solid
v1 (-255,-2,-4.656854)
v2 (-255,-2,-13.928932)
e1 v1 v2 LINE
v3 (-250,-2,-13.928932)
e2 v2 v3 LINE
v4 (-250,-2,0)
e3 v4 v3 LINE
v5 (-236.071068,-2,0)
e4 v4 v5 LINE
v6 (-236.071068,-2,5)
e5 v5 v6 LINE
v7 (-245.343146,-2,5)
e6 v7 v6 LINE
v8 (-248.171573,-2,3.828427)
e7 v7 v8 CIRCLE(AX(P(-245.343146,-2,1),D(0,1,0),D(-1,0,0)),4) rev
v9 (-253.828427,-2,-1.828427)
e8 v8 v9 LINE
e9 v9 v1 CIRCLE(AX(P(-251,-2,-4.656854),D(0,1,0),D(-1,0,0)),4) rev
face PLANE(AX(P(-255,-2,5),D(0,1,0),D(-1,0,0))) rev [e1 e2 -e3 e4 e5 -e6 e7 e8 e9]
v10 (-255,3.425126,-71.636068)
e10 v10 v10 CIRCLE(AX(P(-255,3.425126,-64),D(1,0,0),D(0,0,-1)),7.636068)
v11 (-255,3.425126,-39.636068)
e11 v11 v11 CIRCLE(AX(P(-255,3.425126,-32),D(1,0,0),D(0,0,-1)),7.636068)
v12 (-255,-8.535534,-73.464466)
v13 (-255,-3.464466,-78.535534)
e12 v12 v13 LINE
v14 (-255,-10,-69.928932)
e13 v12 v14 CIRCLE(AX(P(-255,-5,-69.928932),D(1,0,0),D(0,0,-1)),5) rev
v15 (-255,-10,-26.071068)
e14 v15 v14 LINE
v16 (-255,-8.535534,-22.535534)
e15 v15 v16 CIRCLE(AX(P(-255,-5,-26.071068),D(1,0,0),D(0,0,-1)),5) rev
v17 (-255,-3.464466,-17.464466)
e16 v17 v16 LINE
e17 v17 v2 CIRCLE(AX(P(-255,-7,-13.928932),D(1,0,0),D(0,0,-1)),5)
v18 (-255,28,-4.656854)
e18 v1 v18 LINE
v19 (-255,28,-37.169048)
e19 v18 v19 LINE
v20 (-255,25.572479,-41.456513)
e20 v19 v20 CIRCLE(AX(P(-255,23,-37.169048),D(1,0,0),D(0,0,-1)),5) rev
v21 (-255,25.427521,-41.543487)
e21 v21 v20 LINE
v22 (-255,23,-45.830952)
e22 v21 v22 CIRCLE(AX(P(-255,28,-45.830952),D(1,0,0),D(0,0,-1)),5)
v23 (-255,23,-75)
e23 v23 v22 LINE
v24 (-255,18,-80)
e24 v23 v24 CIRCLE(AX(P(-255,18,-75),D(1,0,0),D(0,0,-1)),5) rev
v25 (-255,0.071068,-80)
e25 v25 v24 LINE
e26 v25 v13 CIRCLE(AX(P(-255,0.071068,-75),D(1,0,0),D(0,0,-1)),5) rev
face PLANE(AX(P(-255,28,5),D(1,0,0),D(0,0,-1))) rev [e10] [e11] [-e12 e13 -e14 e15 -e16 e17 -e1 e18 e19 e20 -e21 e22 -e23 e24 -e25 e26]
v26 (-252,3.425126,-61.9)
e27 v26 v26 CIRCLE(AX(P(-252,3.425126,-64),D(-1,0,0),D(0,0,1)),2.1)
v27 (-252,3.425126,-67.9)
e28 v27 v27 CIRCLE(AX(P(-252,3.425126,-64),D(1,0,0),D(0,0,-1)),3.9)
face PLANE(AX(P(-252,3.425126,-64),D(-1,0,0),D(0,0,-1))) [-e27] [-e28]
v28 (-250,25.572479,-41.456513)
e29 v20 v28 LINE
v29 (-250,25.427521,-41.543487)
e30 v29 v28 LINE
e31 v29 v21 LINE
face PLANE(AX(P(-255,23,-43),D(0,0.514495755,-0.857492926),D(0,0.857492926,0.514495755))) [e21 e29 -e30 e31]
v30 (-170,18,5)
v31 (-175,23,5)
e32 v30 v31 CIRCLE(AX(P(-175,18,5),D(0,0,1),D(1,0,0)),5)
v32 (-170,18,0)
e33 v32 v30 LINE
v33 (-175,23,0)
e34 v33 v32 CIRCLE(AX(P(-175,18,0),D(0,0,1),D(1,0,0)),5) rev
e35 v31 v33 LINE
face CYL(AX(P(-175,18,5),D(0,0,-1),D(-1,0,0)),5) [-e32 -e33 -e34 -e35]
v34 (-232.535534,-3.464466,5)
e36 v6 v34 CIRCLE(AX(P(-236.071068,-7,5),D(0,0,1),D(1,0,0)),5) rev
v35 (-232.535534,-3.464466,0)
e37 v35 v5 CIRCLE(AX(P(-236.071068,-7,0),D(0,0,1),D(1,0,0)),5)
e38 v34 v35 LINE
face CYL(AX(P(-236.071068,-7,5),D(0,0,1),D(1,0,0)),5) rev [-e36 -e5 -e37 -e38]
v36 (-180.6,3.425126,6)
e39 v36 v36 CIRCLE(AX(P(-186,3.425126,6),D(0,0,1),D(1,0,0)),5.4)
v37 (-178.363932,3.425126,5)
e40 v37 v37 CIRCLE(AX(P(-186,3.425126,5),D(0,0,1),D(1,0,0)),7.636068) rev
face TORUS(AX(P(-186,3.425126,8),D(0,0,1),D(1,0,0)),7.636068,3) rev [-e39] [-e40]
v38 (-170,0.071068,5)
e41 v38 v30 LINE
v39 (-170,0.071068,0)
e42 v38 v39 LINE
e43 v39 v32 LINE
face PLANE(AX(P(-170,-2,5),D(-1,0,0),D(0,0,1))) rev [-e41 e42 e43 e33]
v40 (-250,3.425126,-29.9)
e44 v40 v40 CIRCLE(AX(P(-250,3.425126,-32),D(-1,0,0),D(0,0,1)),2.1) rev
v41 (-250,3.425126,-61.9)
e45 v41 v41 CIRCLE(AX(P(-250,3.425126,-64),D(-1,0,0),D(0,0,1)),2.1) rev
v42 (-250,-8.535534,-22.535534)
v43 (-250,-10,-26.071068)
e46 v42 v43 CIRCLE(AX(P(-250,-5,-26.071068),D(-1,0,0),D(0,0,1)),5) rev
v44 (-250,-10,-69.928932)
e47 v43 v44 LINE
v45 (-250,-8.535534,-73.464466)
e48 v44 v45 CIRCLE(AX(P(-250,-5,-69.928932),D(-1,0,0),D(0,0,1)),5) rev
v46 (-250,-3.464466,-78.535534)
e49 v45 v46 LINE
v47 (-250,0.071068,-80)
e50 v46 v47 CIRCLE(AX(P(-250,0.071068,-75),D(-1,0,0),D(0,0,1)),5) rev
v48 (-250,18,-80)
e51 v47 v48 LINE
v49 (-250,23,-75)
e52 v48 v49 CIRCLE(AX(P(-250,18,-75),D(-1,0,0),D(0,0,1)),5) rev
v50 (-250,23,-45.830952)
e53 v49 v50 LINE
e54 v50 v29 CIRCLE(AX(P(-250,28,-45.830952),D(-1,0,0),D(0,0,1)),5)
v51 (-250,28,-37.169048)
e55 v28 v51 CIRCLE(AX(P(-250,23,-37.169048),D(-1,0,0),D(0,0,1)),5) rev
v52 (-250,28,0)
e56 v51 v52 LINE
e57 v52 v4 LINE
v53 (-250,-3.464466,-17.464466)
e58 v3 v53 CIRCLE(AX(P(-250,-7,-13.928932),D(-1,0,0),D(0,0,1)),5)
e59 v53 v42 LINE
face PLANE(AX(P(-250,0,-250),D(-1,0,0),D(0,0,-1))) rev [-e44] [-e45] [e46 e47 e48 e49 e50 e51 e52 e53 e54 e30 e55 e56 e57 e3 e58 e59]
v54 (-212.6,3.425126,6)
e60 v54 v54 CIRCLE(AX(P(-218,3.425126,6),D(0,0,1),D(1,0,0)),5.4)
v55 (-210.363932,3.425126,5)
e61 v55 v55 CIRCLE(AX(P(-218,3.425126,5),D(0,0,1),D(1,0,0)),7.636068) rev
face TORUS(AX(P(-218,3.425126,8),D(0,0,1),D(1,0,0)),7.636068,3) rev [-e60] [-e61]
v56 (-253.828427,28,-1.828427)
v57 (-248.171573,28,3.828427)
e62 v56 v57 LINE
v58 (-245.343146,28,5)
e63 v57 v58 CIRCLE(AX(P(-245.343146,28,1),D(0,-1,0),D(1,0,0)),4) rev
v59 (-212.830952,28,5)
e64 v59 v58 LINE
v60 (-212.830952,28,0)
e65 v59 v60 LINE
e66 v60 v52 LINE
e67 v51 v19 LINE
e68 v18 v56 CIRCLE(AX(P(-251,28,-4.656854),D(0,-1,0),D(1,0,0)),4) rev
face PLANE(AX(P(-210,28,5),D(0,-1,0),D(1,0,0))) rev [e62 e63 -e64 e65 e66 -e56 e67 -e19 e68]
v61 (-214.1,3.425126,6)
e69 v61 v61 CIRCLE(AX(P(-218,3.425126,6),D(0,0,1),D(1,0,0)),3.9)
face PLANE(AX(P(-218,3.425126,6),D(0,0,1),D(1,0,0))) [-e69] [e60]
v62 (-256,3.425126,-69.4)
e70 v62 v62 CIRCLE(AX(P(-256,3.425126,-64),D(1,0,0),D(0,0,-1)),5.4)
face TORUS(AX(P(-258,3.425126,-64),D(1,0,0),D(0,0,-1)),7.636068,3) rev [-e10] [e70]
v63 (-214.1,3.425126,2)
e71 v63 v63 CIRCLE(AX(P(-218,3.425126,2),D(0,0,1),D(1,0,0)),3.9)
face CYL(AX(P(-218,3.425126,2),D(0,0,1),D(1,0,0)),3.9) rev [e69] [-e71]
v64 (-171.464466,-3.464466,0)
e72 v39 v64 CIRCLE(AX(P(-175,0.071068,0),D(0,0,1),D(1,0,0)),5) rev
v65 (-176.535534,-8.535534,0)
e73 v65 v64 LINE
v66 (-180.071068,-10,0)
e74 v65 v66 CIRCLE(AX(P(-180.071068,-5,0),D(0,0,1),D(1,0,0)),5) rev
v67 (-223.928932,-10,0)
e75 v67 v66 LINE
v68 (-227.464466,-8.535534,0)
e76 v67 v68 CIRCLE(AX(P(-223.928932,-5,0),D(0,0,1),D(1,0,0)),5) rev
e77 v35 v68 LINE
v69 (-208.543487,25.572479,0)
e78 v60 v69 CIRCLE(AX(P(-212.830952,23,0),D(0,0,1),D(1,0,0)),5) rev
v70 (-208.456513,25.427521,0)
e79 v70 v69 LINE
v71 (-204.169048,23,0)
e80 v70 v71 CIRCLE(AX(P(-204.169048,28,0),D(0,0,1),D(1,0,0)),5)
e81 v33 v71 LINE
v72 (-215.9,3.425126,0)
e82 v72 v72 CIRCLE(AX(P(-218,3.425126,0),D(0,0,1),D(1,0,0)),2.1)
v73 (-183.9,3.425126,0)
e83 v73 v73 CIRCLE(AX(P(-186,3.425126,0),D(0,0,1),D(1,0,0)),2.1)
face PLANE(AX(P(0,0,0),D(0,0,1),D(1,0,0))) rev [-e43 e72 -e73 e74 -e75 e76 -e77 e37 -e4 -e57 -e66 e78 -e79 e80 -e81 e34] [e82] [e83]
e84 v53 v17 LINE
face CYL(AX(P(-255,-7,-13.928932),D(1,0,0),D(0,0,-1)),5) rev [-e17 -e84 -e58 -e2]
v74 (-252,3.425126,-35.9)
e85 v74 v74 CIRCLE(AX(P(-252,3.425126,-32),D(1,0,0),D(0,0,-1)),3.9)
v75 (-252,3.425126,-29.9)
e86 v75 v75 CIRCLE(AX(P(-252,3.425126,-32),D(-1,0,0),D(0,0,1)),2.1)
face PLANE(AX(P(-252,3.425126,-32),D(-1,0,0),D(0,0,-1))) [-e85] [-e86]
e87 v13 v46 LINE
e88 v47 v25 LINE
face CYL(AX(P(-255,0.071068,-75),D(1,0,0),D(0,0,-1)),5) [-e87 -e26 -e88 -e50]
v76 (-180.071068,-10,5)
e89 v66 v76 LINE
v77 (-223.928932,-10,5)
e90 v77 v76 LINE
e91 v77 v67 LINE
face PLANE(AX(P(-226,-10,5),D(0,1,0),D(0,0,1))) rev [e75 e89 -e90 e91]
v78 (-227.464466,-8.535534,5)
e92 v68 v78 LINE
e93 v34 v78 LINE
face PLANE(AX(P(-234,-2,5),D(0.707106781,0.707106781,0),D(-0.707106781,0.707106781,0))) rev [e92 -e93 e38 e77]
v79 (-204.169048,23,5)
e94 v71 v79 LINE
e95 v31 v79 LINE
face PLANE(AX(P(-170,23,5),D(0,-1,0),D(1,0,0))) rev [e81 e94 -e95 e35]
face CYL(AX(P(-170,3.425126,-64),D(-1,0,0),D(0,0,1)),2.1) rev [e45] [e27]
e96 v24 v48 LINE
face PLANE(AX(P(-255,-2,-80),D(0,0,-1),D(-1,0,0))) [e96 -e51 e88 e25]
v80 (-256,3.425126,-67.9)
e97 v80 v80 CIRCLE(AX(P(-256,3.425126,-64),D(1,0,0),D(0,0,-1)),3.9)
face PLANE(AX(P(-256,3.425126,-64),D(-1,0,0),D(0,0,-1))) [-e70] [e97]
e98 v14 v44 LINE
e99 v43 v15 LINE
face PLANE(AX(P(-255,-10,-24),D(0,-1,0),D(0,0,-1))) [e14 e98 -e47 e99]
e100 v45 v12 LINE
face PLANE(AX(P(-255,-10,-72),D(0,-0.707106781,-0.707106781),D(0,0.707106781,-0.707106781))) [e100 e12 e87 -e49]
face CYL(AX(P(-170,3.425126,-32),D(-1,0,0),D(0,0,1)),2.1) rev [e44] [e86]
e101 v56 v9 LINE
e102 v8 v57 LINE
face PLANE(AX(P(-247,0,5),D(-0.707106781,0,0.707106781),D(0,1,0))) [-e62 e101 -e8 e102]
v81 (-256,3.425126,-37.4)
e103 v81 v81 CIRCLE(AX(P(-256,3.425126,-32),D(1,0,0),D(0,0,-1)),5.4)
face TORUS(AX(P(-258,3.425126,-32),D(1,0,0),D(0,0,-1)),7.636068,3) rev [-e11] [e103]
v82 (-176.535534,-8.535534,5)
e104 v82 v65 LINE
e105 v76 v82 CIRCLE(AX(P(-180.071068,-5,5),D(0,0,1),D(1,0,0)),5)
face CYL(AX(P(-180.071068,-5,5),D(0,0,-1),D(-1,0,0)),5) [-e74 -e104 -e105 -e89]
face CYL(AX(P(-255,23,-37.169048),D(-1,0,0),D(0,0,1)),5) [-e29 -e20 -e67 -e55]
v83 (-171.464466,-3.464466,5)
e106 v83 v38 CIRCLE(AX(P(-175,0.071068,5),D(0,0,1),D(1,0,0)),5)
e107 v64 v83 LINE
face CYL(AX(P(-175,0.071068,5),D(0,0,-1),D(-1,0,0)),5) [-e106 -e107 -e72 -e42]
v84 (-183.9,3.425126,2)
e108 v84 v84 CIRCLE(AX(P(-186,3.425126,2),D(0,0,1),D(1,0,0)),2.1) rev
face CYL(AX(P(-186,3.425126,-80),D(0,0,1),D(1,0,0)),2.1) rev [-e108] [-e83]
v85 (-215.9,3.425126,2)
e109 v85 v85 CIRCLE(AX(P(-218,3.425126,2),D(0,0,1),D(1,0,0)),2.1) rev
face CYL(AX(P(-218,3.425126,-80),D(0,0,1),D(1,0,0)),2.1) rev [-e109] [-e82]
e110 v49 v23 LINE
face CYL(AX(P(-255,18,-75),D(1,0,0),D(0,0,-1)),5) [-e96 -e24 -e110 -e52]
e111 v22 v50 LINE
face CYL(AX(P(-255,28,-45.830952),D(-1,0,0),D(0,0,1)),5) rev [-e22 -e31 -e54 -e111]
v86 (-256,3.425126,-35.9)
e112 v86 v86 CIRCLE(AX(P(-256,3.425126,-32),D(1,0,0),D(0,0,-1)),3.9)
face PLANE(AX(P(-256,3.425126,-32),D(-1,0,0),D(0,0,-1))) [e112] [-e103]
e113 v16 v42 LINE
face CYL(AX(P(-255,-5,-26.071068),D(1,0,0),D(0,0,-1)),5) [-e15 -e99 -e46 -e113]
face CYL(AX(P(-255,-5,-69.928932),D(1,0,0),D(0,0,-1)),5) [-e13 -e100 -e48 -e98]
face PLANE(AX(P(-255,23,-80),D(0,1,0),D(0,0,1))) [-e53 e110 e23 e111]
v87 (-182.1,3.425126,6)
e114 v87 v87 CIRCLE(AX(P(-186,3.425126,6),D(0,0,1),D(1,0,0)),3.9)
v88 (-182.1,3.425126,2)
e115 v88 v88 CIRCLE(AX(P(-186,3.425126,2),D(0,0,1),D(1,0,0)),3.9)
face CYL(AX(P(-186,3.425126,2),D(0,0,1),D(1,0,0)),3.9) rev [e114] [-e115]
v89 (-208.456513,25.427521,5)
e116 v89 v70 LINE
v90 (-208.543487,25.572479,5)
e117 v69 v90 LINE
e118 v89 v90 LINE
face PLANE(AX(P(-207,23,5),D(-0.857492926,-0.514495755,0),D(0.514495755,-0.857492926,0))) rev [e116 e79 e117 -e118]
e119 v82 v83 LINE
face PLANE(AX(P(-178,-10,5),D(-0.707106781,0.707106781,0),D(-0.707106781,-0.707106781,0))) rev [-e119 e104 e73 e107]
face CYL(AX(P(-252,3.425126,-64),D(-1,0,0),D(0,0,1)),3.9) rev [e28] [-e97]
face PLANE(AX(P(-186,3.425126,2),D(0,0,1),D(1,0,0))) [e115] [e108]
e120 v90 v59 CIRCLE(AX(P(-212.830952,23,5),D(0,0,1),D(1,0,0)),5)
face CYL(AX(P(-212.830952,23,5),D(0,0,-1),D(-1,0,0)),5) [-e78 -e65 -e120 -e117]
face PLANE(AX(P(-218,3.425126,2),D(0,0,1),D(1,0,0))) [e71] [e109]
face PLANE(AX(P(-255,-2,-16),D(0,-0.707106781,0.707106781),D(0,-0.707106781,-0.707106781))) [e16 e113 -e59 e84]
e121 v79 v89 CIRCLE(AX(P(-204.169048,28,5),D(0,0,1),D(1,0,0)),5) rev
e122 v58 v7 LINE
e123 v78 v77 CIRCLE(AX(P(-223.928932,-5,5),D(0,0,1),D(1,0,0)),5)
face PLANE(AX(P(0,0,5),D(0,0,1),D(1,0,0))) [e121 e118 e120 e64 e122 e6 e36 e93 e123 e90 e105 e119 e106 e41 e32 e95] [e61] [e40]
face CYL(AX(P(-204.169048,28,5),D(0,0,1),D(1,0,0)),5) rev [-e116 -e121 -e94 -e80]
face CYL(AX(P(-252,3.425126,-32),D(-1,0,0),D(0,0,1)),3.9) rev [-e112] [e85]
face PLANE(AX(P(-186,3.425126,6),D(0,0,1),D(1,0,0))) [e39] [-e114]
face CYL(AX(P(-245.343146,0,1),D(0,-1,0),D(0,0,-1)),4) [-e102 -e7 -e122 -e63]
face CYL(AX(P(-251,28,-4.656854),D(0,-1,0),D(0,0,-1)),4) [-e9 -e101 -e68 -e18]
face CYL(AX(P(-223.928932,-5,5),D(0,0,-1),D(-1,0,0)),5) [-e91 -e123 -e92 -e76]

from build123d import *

# Parameters (mm, degrees)
BOSS_EXTRUDE1_DEPTH = 5
FILLET1_R           = 5
CHAMFER1_SIZE       = 8
FILLET2_R           = 4
SKETCH2_R           = 2.1
CUT_EXTRUDE1_DEPTH  = 271.24803422
SKETCH3_R           = 3.9
CUT_EXTRUDE2_DEPTH  = 3
BOSS_EXTRUDE2_START = 1
SKETCH4_R           = 5.4
SKETCH4_R_2         = 3.9
BOSS_EXTRUDE2_DEPTH = 1
FILLET3_R           = 3


with BuildPart() as part:
    # Sketch1 → Boss-Extrude1 (new body)
    with BuildSketch(Plane.XY):
        Polygon((-255, 28), (-255, -2), (-234, -2), (-226, -10), (-178, -10), (-170, -2), (-170, 23), (-207, 23), (-210, 28), align=None)
    boss_extrude1 = extrude(amount=BOSS_EXTRUDE1_DEPTH)

    # Mirror1: Boss-Extrude1 across plane
    add(boss_extrude1.mirror(Plane(origin=(-125, 0, -125), x_dir=(-0.7071067811865489, 0, 0.7071067811865462), z_dir=(-0.7071067811865464, 0, -0.7071067811865488))))

    # Fillet1
    fillet1_edges = [part.edges().sort_by_distance(p)[0] for p in [
        (-210, 28, 2.5),
        (-207, 23, 2.5),
        (-170, 23, 2.5),
        (-170, -2, 2.5),
        (-178, -10, 2.5),
        (-226, -10, 2.5),
        (-234, -2, 2.5),
        (-252.5, -2, -16),
        (-252.5, 28, -40),
        (-252.5, 23, -43),
        (-252.5, 23, -80),
        (-252.5, -2, -80),
        (-252.5, -10, -72),
        (-252.5, -10, -24),
    ]]
    fillet(fillet1_edges, radius=FILLET1_R)

    # Chamfer1
    chamfer1_edges = [part.edges().sort_by_distance(p)[0] for p in [
        (-255, 13, 5),
    ]]
    chamfer(chamfer1_edges, length=CHAMFER1_SIZE)

    # Fillet2
    fillet2_edges = [part.edges().sort_by_distance(p)[0] for p in [
        (-247, 13, 5),
        (-255, 13, -3),
    ]]
    fillet(fillet2_edges, radius=FILLET2_R)

    # Sketch2 → Cut-Extrude1 (cut, through all)
    with BuildSketch(Plane.XY.offset(5)):
        with Locations((-218, 3.425126266)):
            Circle(SKETCH2_R)
        with Locations((-186, 3.425126266)):
            Circle(SKETCH2_R)
    cut_extrude1 = extrude(amount=-CUT_EXTRUDE1_DEPTH, mode=Mode.SUBTRACT)

    # Sketch3 → Cut-Extrude2 (cut)
    with BuildSketch(Plane.XY.offset(5)):
        with Locations((-218, 3.425126266)):
            Circle(SKETCH3_R)
        with Locations((-186, 3.425126266)):
            Circle(SKETCH3_R)
    cut_extrude2 = extrude(amount=-CUT_EXTRUDE2_DEPTH, mode=Mode.SUBTRACT)

    # Sketch4 → Boss-Extrude2 (add)
    # profile 1 of 2: a face of its own
    with BuildSketch(Plane.XY.offset(5).offset(BOSS_EXTRUDE2_START)):
        with Locations((-218, 3.425126266)):
            Circle(SKETCH4_R)
        with Locations((-218, 3.425126266)):
            Circle(SKETCH4_R_2, mode=Mode.SUBTRACT)
    # profile 2 of 2: a face of its own
    with BuildSketch(Plane.XY.offset(5).offset(BOSS_EXTRUDE2_START)):
        with Locations((-186, 3.425126266)):
            Circle(SKETCH4_R)
        with Locations((-186, 3.425126266)):
            Circle(SKETCH4_R_2, mode=Mode.SUBTRACT)
    boss_extrude2 = extrude(amount=-BOSS_EXTRUDE2_DEPTH)

    # Mirror2: Cut-Extrude1, Cut-Extrude2, Boss-Extrude2 across plane
    add(cut_extrude1.mirror(Plane(origin=(-125, 0, -125), x_dir=(-0.7071067811865489, 0, 0.7071067811865462), z_dir=(-0.7071067811865464, 0, -0.7071067811865488))), mode=Mode.SUBTRACT)
    add(cut_extrude2.mirror(Plane(origin=(-125, 0, -125), x_dir=(-0.7071067811865489, 0, 0.7071067811865462), z_dir=(-0.7071067811865464, 0, -0.7071067811865488))), mode=Mode.SUBTRACT)
    add(boss_extrude2.mirror(Plane(origin=(-125, 0, -125), x_dir=(-0.7071067811865489, 0, 0.7071067811865462), z_dir=(-0.7071067811865464, 0, -0.7071067811865488))))

    # Fillet3
    # the kernel refuses this fillet: 3 mm, written as the material it adds along each edge
    with BuildSketch(Plane(origin=(-218, 3.425126266, 5), x_dir=(1, 0, 0), z_dir=(0, -1, 0))) as fillet3_piece_1:
        with BuildLine():
            CenterArc((7.636067977, 3), FILLET3_R, 221.810314896, 48.189685104)
            Line((5.4, 1), (5.35527864, 0.96))
            ThreePointArc((5.35527864, 0.96), (5.34, 0.5), (5.34, 0))
            Line((5.34, 0), (5.4, -0.06))
            Line((5.4, -0.06), (7.636067977, -0.06))
            Line((7.636067977, -0.06), (7.636067977, 0))
        make_face()
    revolve(axis=Axis((-218, 3.425126266, 5), (0, 0, 1)))
    with BuildSketch(Plane(origin=(-186, 3.425126266, 5), x_dir=(1, 0, 0), z_dir=(0, -1, 0))) as fillet3_piece_2:
        with BuildLine():
            CenterArc((7.636067977, 3), FILLET3_R, 221.810314896, 48.189685104)
            Line((7.636067977, 0), (7.636067977, -0.06))
            Line((7.636067977, -0.06), (5.4, -0.06))
            Line((5.4, -0.06), (5.34, 0))
            ThreePointArc((5.34, 0), (5.34, 0.5), (5.35527864, 0.96))
            Line((5.35527864, 0.96), (5.4, 1))
        make_face()
    revolve(axis=Axis((-186, 3.425126266, 5), (0, 0, 1)))
    with BuildSketch(Plane(origin=(-255, 3.425126266, -32), x_dir=(0, 0, -1), z_dir=(0, -1, 0))) as fillet3_piece_3:
        with BuildLine():
            CenterArc((7.636067977, -3), FILLET3_R, 90, 48.189685104)
            Line((5.4, -1), (5.35527864, -0.96))
            ThreePointArc((5.35527864, -0.96), (5.34, -0.5), (5.34, 0))
            Line((5.34, 0), (5.4, 0.06))
            Line((5.4, 0.06), (7.636067977, 0.06))
            Line((7.636067977, 0.06), (7.636067977, 0))
        make_face()
    revolve(axis=Axis((-255, 3.425126266, -32), (1, 0, 0)))
    with BuildSketch(Plane(origin=(-255, 3.425126266, -64), x_dir=(0, 0, -1), z_dir=(0, -1, 0))) as fillet3_piece_4:
        with BuildLine():
            CenterArc((7.636067977, -3), FILLET3_R, 90, 48.189685104)
            Line((5.4, -1), (5.35527864, -0.96))
            ThreePointArc((5.35527864, -0.96), (5.34, -0.5), (5.34, 0))
            Line((5.34, 0), (5.4, 0.06))
            Line((5.4, 0.06), (7.636067977, 0.06))
            Line((7.636067977, 0.06), (7.636067977, 0))
        make_face()
    revolve(axis=Axis((-255, 3.425126266, -64), (1, 0, 0)))


solid = part.part
